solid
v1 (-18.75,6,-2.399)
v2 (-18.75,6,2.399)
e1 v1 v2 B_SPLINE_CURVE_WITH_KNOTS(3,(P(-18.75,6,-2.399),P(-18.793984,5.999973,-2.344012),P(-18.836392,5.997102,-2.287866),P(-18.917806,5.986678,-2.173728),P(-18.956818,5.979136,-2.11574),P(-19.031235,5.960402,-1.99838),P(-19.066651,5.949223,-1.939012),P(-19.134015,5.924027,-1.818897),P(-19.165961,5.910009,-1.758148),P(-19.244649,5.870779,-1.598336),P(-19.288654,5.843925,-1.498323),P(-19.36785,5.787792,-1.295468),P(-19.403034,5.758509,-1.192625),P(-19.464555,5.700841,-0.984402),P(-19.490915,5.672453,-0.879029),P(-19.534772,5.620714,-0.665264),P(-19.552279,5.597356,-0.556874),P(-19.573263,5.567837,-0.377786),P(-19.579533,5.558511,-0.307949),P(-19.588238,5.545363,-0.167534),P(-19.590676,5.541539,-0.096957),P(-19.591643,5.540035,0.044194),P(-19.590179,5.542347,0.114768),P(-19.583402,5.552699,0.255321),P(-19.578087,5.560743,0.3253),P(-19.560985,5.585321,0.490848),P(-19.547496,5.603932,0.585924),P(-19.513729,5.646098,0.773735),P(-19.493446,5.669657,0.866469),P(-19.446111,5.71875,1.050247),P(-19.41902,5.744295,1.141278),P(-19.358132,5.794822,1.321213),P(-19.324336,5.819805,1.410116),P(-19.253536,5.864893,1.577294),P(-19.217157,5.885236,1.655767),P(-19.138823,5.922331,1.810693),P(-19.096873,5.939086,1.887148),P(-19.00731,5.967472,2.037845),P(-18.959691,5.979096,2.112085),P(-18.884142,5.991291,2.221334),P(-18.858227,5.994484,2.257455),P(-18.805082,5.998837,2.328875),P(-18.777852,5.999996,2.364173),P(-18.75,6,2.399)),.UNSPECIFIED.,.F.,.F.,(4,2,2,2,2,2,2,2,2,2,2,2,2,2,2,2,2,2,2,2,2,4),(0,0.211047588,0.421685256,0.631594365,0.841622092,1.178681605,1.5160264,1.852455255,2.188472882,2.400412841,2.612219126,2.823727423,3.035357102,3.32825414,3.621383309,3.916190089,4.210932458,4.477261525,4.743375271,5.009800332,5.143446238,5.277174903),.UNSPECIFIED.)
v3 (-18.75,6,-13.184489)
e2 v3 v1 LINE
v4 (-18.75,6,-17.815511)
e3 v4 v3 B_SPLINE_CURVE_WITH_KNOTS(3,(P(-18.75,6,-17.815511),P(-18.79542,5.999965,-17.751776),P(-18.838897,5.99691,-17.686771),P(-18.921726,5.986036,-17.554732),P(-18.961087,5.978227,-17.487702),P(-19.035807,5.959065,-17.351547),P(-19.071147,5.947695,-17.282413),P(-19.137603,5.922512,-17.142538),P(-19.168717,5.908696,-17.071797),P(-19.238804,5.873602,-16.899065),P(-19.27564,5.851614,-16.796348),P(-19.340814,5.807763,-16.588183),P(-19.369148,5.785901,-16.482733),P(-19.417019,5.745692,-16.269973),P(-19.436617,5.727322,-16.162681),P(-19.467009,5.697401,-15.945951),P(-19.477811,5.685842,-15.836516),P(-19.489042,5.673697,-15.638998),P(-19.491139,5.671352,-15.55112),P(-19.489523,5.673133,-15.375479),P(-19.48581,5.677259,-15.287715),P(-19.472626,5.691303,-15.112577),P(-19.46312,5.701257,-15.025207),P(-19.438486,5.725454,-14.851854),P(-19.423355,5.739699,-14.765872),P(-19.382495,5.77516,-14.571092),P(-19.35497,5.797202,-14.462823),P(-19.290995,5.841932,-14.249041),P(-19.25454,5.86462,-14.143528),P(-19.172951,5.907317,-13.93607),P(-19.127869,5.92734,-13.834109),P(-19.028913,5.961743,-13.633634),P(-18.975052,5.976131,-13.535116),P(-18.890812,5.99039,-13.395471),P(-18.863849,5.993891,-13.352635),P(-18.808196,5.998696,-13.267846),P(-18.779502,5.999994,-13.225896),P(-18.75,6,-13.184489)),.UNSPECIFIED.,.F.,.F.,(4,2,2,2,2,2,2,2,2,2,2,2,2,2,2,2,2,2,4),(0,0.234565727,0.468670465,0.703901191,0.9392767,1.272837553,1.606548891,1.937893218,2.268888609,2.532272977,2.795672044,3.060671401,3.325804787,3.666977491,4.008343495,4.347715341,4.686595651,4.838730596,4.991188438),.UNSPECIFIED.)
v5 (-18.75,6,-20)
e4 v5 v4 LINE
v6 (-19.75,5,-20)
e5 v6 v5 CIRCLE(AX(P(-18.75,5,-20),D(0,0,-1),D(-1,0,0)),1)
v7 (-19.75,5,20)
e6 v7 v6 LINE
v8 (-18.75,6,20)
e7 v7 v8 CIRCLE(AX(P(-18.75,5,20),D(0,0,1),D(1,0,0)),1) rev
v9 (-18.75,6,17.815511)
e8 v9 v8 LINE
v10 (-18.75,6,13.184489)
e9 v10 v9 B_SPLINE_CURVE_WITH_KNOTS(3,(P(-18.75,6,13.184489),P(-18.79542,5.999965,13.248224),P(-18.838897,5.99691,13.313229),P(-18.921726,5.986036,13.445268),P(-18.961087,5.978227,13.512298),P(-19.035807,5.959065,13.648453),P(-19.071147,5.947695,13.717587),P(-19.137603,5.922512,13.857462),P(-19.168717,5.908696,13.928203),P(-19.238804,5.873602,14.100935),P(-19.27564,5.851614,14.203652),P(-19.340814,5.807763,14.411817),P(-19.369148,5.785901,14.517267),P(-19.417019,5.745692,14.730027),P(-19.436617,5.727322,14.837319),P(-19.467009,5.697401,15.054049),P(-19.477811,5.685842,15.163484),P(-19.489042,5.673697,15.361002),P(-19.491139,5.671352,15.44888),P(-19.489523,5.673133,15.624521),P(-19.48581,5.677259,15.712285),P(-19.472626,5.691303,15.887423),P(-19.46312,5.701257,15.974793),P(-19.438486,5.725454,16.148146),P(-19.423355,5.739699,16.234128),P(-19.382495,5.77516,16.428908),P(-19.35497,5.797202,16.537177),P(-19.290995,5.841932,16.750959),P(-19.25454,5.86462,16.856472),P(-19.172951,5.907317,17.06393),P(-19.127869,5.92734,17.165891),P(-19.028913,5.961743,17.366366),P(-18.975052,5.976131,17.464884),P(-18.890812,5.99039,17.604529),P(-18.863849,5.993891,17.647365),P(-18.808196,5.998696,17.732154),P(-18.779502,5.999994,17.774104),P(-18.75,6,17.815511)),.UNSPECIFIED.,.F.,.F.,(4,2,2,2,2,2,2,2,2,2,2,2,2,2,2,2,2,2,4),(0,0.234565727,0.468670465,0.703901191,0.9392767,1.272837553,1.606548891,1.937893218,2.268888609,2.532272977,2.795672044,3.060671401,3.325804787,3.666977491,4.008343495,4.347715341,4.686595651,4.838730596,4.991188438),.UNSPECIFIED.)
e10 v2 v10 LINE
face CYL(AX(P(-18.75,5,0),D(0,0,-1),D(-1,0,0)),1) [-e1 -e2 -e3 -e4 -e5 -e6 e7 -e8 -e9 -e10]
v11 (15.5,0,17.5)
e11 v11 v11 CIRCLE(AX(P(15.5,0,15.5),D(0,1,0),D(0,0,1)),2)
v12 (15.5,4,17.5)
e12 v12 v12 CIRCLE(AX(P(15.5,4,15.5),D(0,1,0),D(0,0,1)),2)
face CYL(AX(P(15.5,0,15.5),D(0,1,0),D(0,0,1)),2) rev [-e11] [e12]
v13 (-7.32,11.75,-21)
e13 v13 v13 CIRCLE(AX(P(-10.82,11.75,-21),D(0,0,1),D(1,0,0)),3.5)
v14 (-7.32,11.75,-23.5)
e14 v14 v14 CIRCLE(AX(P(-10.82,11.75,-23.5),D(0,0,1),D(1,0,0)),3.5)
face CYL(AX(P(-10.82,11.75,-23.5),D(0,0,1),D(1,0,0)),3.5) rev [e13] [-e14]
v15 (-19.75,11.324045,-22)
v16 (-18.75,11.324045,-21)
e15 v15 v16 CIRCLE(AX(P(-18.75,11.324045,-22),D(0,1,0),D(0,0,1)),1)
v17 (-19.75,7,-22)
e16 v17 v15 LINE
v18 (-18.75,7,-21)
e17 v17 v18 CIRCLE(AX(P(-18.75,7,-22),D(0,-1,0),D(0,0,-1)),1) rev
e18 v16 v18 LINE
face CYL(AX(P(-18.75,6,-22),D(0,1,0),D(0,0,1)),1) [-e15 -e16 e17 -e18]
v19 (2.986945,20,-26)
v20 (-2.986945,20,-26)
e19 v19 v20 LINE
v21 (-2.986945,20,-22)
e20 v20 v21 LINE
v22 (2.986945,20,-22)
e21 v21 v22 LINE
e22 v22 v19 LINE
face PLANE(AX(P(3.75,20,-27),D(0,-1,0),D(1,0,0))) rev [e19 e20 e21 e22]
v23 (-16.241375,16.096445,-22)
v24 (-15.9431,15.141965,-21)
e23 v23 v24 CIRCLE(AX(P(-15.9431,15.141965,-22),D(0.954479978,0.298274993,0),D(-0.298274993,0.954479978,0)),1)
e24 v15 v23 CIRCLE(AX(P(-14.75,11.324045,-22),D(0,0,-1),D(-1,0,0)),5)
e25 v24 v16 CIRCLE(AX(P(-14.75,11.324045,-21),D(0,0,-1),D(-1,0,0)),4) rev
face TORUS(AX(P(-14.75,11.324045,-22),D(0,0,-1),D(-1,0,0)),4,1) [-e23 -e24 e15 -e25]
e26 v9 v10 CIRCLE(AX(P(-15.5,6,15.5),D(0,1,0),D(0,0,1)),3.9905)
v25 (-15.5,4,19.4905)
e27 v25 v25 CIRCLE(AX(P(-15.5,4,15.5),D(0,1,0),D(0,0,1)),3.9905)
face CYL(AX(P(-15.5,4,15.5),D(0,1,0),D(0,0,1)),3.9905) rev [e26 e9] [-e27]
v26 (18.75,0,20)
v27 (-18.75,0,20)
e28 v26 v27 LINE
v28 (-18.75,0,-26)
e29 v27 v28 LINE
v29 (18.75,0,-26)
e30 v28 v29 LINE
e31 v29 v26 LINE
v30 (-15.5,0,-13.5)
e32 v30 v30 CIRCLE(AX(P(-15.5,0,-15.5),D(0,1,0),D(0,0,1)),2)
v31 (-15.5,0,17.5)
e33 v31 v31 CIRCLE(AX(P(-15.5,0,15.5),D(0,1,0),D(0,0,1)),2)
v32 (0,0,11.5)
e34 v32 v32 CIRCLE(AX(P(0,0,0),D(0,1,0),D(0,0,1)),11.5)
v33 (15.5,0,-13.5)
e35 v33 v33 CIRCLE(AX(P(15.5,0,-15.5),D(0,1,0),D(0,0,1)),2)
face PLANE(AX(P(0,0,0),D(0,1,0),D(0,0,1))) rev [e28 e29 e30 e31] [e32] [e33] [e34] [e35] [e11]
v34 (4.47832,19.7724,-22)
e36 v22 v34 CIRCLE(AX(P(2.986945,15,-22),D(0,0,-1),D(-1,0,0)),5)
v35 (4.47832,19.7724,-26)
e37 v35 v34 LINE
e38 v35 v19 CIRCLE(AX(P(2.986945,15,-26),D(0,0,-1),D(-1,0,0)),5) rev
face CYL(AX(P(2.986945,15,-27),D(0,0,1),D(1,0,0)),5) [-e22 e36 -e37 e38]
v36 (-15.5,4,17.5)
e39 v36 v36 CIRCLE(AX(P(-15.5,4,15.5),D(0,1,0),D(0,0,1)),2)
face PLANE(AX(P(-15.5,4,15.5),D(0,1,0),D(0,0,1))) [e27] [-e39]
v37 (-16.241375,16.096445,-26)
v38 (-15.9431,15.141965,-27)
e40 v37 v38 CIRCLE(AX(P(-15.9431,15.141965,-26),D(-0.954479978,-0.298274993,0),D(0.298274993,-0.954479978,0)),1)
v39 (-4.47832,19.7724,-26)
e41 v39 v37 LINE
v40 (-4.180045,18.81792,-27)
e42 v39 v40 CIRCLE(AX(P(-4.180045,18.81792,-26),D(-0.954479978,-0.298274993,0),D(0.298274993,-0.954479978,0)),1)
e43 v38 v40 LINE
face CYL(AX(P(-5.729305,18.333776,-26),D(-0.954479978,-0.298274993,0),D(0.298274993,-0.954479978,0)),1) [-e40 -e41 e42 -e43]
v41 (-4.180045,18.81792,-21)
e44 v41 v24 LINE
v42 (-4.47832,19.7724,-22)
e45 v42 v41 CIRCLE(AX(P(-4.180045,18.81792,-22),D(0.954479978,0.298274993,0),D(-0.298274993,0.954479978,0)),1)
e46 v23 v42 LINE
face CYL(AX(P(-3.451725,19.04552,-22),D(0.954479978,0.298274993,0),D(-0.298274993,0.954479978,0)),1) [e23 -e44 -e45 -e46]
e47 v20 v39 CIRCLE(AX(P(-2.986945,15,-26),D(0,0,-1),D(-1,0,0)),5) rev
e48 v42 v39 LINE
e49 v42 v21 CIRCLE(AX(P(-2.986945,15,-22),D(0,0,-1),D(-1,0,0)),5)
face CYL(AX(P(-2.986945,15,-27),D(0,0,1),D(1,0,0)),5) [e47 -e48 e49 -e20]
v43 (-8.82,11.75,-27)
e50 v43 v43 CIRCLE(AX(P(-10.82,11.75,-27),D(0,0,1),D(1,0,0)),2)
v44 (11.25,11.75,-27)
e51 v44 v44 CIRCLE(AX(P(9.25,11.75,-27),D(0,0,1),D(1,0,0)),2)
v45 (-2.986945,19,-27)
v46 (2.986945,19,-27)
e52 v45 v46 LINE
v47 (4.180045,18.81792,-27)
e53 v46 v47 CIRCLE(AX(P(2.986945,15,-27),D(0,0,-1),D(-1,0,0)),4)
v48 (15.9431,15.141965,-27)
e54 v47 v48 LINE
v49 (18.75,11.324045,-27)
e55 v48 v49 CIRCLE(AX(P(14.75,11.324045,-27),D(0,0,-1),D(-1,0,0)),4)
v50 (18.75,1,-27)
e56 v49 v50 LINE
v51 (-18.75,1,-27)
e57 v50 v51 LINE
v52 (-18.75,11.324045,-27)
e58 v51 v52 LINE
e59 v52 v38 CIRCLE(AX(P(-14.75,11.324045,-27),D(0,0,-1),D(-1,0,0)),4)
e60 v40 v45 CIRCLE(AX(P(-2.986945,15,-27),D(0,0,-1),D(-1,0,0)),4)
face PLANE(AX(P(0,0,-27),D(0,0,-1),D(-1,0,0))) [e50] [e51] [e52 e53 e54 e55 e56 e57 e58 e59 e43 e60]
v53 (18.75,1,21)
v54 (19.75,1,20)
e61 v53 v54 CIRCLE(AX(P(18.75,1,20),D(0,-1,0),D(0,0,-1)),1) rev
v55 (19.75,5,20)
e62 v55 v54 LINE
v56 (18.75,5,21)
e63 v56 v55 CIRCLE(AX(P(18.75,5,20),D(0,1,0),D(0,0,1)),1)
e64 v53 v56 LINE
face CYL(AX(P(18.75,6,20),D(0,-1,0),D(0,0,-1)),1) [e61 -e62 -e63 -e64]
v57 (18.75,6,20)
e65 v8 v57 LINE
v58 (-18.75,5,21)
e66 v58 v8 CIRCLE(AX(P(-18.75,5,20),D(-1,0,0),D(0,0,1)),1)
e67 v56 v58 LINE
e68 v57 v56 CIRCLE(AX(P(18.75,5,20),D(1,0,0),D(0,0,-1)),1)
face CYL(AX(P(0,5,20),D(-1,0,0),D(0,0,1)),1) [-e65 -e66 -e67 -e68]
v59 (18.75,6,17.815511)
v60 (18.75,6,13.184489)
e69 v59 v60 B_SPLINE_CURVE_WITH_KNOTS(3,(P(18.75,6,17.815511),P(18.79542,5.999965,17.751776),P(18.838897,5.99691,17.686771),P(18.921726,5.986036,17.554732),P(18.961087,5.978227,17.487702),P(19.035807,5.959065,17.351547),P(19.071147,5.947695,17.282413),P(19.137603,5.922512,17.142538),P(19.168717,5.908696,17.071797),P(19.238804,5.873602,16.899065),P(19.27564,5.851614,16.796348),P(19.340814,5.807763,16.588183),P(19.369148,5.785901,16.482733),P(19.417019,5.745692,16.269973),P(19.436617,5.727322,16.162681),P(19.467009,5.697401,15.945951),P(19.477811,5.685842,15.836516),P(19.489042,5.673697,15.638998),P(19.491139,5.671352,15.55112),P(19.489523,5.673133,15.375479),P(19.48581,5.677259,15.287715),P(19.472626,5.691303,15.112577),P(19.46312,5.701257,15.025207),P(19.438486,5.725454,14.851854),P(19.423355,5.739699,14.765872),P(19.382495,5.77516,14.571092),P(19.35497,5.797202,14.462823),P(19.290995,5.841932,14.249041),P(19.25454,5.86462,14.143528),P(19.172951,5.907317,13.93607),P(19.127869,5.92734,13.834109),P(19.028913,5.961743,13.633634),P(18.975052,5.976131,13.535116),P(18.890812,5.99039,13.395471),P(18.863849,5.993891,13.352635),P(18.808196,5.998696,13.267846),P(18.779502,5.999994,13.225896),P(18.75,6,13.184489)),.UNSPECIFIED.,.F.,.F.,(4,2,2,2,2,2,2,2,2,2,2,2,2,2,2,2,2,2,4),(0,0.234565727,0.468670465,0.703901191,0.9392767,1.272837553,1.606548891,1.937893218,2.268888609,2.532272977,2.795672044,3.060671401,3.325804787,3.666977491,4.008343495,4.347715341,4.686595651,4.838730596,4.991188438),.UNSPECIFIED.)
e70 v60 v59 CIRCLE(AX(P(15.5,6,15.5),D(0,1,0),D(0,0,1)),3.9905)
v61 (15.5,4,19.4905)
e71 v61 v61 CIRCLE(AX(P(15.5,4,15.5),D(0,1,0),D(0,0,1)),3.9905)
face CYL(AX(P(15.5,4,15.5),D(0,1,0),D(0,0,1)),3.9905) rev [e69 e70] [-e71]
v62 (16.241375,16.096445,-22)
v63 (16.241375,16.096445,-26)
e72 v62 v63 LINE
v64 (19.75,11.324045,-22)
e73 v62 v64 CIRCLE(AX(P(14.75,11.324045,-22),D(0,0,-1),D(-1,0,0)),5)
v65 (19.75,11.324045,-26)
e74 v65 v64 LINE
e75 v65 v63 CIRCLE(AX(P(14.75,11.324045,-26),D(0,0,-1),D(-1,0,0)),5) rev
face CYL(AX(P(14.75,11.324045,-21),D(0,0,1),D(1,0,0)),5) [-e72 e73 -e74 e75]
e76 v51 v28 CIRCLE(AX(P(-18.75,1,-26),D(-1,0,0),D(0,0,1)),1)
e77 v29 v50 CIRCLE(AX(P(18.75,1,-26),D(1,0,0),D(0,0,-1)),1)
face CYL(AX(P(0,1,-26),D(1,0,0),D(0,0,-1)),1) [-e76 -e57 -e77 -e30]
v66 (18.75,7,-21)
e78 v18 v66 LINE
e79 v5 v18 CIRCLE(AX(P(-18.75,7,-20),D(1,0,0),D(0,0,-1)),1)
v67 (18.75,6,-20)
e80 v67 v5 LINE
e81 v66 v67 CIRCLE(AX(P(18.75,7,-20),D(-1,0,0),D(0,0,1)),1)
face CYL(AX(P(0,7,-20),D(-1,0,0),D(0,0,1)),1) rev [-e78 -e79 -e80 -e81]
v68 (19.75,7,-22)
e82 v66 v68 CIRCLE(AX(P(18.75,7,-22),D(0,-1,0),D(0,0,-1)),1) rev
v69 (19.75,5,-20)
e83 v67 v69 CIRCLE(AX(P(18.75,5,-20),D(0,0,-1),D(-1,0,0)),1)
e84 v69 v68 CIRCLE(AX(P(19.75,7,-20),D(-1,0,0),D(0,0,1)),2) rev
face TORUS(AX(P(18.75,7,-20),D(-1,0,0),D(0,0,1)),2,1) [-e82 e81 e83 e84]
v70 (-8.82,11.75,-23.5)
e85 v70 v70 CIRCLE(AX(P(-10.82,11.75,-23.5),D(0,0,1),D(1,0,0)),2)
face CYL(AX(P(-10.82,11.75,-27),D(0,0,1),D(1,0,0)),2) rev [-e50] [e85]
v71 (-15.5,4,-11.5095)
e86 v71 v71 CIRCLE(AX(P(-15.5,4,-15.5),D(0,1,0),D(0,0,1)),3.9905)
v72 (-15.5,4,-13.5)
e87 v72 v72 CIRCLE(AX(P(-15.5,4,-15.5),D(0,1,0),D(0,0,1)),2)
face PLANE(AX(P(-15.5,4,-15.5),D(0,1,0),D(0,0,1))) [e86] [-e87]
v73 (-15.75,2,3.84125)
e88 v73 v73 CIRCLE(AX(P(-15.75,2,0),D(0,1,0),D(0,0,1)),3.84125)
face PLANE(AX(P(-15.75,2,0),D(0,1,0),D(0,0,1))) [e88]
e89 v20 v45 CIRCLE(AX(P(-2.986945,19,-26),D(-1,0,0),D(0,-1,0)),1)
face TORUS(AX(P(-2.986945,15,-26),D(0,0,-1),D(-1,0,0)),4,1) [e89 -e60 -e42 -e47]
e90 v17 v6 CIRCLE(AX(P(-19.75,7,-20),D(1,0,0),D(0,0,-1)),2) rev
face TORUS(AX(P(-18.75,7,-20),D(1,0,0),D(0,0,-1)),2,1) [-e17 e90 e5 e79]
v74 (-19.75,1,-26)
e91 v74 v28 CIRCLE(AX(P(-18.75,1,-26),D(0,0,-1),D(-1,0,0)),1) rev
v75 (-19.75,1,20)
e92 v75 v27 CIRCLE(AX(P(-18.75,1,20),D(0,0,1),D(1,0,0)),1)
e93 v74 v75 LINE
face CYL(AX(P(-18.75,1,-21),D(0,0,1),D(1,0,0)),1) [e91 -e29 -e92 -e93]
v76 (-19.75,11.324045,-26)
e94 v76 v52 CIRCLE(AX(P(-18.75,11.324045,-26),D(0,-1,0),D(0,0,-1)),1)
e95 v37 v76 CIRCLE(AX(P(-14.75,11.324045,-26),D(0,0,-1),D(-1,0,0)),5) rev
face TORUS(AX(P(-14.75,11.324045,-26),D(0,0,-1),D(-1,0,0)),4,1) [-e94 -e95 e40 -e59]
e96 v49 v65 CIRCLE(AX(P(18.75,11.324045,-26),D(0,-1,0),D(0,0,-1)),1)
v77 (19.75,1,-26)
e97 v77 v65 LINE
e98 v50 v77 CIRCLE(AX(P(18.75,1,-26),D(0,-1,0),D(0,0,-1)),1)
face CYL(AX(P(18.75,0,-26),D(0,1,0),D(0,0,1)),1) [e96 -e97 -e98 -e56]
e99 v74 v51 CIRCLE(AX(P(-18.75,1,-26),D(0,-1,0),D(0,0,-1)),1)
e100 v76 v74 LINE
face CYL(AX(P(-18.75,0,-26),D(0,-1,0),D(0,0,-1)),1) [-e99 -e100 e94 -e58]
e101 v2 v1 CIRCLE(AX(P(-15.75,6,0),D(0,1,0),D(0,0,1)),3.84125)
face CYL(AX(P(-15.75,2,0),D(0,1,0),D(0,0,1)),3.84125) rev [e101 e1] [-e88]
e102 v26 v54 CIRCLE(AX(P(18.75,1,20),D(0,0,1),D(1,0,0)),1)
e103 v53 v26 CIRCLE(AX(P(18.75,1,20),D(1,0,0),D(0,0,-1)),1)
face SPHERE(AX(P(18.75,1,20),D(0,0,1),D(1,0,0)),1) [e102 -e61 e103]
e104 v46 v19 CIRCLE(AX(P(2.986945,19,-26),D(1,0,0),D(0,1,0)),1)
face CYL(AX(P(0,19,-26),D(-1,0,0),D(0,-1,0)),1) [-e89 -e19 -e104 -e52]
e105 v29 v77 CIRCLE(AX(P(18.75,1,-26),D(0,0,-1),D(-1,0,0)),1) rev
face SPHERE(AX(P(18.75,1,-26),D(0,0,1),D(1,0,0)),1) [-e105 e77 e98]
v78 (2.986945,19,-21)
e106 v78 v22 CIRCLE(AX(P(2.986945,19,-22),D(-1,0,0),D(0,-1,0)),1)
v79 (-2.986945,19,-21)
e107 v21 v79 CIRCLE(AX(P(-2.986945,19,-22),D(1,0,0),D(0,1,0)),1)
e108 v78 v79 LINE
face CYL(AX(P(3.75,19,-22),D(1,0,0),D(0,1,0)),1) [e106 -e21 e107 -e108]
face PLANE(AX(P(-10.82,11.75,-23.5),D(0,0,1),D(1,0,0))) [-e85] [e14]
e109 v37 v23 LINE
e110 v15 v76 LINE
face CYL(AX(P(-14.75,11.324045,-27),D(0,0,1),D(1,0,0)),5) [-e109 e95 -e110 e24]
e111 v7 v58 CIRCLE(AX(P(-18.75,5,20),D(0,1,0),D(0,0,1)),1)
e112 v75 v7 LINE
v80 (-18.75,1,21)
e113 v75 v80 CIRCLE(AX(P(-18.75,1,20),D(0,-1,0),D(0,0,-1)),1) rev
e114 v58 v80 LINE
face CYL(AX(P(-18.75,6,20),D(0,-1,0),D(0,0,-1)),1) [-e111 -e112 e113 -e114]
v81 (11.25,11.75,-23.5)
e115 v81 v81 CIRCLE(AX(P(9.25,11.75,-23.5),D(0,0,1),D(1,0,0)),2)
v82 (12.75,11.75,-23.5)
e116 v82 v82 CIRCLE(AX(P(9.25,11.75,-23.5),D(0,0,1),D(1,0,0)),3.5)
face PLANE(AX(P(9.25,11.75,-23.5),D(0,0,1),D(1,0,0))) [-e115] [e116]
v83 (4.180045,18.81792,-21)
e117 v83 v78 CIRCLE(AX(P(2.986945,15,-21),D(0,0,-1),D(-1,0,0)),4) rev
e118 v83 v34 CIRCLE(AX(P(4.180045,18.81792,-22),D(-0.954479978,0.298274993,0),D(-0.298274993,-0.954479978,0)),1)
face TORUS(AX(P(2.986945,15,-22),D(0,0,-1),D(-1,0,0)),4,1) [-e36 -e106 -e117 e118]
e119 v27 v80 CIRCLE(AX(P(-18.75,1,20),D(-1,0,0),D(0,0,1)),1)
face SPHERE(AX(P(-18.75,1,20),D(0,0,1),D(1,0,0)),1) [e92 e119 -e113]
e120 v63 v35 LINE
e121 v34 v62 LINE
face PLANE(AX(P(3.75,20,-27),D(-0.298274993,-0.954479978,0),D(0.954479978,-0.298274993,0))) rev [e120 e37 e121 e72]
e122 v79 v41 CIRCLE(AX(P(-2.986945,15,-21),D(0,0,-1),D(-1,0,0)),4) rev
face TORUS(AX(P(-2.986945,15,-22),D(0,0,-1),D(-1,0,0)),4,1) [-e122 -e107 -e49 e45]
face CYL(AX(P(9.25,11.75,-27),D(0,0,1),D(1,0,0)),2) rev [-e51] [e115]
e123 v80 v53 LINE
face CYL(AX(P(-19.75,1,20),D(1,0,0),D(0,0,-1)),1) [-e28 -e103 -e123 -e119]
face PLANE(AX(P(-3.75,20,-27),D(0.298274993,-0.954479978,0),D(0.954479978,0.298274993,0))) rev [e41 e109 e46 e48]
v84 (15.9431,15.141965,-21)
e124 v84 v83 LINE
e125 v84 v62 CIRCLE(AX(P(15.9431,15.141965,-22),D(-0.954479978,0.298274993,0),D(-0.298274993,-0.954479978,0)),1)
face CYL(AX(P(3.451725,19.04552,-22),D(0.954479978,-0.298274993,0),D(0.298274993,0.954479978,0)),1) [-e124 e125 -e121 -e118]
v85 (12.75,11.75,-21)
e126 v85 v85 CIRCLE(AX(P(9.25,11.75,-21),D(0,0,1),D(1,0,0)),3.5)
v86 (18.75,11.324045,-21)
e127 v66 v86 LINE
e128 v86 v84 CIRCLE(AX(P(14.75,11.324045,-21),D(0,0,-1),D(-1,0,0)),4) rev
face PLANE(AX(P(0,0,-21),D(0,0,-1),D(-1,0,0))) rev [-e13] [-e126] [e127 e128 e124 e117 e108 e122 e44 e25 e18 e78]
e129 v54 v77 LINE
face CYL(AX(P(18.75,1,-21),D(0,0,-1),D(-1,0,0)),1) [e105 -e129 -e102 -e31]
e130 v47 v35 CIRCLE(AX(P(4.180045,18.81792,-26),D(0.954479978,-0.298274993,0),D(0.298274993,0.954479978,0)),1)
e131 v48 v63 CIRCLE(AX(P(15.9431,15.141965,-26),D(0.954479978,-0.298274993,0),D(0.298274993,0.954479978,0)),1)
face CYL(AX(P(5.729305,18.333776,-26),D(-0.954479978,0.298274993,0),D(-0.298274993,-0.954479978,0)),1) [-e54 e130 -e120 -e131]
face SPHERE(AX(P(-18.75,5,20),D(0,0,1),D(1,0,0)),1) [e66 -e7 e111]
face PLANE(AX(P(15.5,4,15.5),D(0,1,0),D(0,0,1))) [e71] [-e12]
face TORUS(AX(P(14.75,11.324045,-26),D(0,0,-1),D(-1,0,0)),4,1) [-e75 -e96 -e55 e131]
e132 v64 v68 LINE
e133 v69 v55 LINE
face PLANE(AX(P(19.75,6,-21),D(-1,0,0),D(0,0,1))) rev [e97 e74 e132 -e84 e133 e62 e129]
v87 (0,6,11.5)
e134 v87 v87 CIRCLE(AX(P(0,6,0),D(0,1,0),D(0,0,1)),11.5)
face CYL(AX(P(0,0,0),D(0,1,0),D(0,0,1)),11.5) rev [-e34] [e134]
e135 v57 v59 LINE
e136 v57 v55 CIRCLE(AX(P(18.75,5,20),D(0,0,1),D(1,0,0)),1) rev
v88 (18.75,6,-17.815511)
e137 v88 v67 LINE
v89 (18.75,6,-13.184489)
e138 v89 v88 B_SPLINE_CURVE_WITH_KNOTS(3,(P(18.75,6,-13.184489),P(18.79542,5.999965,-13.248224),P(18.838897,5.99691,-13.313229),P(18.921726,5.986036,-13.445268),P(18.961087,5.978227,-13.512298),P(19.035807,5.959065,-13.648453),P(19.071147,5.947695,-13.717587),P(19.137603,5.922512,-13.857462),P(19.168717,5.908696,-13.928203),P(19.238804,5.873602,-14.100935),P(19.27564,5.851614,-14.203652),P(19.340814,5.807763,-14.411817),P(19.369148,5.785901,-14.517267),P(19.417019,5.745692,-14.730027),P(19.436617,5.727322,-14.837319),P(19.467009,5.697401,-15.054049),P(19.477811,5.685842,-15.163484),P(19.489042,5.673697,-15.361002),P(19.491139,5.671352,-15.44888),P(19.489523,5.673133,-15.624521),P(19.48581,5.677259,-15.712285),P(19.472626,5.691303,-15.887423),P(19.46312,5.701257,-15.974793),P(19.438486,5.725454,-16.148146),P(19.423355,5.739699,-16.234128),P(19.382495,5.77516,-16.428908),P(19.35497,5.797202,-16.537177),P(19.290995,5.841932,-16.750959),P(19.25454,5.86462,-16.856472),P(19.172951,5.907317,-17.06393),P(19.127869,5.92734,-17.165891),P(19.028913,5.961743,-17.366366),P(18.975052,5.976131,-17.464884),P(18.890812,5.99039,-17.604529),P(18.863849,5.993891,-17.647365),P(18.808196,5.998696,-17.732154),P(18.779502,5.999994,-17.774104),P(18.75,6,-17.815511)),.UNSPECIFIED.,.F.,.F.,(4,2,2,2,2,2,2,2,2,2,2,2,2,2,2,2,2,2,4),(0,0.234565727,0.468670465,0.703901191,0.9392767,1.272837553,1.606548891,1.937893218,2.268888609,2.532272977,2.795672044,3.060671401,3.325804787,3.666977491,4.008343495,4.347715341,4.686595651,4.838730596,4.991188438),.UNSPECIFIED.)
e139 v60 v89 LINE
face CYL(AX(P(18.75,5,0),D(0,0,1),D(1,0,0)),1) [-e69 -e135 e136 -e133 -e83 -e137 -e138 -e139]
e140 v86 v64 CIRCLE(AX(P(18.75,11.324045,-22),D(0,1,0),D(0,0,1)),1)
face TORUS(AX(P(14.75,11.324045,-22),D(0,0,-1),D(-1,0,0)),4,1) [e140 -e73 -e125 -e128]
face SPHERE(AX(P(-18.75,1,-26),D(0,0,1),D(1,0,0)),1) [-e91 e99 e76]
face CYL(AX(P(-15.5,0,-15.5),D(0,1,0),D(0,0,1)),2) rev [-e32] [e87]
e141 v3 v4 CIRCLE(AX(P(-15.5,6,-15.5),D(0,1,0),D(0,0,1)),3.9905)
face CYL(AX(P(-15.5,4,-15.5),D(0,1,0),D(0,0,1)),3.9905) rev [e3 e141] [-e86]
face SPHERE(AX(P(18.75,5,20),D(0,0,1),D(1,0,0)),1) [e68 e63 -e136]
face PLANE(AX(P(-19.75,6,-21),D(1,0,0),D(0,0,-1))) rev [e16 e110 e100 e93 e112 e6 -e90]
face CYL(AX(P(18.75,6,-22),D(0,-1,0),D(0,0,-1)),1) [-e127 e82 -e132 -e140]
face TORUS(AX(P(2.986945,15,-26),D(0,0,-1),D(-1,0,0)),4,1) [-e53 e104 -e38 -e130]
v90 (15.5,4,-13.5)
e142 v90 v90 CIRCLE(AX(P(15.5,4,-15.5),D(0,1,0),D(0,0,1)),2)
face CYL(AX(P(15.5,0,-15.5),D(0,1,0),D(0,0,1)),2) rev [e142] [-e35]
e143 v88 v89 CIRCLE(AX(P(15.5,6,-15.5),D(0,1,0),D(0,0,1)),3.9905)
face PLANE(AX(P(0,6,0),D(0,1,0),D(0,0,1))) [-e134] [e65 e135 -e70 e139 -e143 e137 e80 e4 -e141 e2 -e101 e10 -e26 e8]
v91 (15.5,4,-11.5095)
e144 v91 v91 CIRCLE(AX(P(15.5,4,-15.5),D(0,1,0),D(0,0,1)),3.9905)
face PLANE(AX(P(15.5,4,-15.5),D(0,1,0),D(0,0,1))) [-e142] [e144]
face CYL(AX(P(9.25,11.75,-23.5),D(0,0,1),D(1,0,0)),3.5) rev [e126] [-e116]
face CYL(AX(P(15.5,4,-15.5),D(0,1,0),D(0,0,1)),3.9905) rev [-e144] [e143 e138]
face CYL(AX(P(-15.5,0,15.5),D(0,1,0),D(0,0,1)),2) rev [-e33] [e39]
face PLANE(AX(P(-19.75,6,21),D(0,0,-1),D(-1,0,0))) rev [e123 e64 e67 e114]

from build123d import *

# Parameters (mm, degrees)
SKETCH1_W           = 39.5
SKETCH1_H           = 42
BOSS_EXTRUDE1_DEPTH = 6
SKETCH3_R           = 3.9905
CUT_EXTRUDE1_DEPTH  = 2
SKETCH4_R           = 11.5
SKETCH4_R_2         = 2
CUT_EXTRUDE2_DEPTH  = 30.445925015
BOSS_EXTRUDE2_DEPTH = 6
SKETCH6_R           = 3.5
CUT_EXTRUDE3_DEPTH  = 2.5
SKETCH7_R           = 2
CUT_EXTRUDE4_DEPTH  = 51.537733428
FILLET1_R           = 5
SKETCH8_R           = 3.84125
CUT_EXTRUDE5_DEPTH  = 4
FILLET2_R           = 1


with BuildPart() as part:
    # Sketch1 → Boss-Extrude1 (new body)
    with BuildSketch(Plane(origin=(0, 0, 0), x_dir=(1, 0, 0), z_dir=(0, 1, 0))):
        Rectangle(SKETCH1_W, SKETCH1_H)
    extrude(amount=BOSS_EXTRUDE1_DEPTH)

    # Sketch3 → Cut-Extrude1 (cut)
    with BuildSketch(Plane(origin=(0, 6, 0), x_dir=(1, 0, 0), z_dir=(0, 1, 0))):
        with Locations(Location((-15.5, 15.5, 0), (0, 0, 270))):
            Circle(SKETCH3_R)
        with Locations(Location((15.5, 15.5, 0), (0, 0, 270))):
            Circle(SKETCH3_R)
        with Locations(Location((-15.5, -15.5, 0), (0, 0, 270))):
            Circle(SKETCH3_R)
        with Locations(Location((15.5, -15.5, 0), (0, 0, 270))):
            Circle(SKETCH3_R)
    extrude(amount=-CUT_EXTRUDE1_DEPTH, mode=Mode.SUBTRACT)

    # Sketch4 → Cut-Extrude2 (cut, through all)
    with BuildSketch(Plane(origin=(0, 6, 0), x_dir=(1, 0, 0), z_dir=(0, 1, 0))):
        with Locations(Location((0, 0, 0), (0, 0, 270))):
            Circle(SKETCH4_R)
        with Locations(Location((15.5, 15.5, 0), (0, 0, 270))):
            Circle(SKETCH4_R_2)
        with Locations(Location((-15.5, 15.5, 0), (0, 0, 270))):
            Circle(SKETCH4_R_2)
        with Locations(Location((-15.5, -15.5, 0), (0, 0, 270))):
            Circle(SKETCH4_R_2)
        with Locations(Location((15.5, -15.5, 0), (0, 0, 270))):
            Circle(SKETCH4_R_2)
    extrude(amount=-CUT_EXTRUDE2_DEPTH, mode=Mode.SUBTRACT)

    # Sketch5 → Boss-Extrude2 (add)
    with BuildSketch(Plane(origin=(0, 0, -21), x_dir=(-1, 0, 0), z_dir=(0, 0, -1))):
        Polygon((-19.75, 15), (-19.75, 0), (19.75, 0), (19.75, 15), (3.75, 20), (-3.75, 20), align=None)
    extrude(amount=BOSS_EXTRUDE2_DEPTH)

    # Sketch6 → Cut-Extrude3 (cut)
    with BuildSketch(Plane.XY.offset(-21)):
        with Locations((-10.82, 11.75)):
            Circle(SKETCH6_R)
        with Locations((9.25, 11.75)):
            Circle(SKETCH6_R)
    extrude(amount=-CUT_EXTRUDE3_DEPTH, mode=Mode.SUBTRACT)

    # Sketch7 → Cut-Extrude4 (cut, through all)
    with BuildSketch(Plane.XY.offset(-21)):
        with Locations((-10.82, 11.75)):
            Circle(SKETCH7_R)
        with Locations((9.25, 11.75)):
            Circle(SKETCH7_R)
    extrude(amount=-CUT_EXTRUDE4_DEPTH, mode=Mode.SUBTRACT)

    # Fillet1
    fillet1_edges = [part.edges().sort_by_distance(p)[0] for p in [
        (-19.75, 15, -24),
        (-3.75, 20, -24),
        (3.75, 20, -24),
        (19.75, 15, -24),
    ]]
    fillet(fillet1_edges, radius=FILLET1_R)

    # Sketch8 → Cut-Extrude5 (cut)
    with BuildSketch(Plane(origin=(0, 6, 0), x_dir=(1, 0, 0), z_dir=(0, 1, 0))):
        with Locations(Location((-15.75, 0, 0), (0, 0, 270))):
            Circle(SKETCH8_R)
    extrude(amount=-CUT_EXTRUDE5_DEPTH, mode=Mode.SUBTRACT)

    # Fillet2
    # the kernel refuses this fillet: 1 mm, written as the material it adds along each edge
    with BuildSketch(Plane(origin=(-19.75, 6, -21), x_dir=(0, 1, 0), z_dir=(1, 0, 0))) as fillet2_piece_1:
        with BuildLine():
            CenterArc((FILLET2_R, FILLET2_R), FILLET2_R, 180, 90)
            Line((0, FILLET2_R), (0, 0))
            Line((0, 0), (FILLET2_R, 0))
        make_face()
    extrude(amount=39.5)
    # the kernel refuses this fillet: 1 mm, written as the material it takes off along each edge
    with BuildSketch(Plane(origin=(18.75, 1, 20), x_dir=(0, 0, 1), z_dir=(1, 0, 0))) as fillet2_2_piece_1_section:
        Polygon((0, 0), (FILLET2_R, 0), (FILLET2_R, FILLET2_R), (0, FILLET2_R), align=None)
    fillet2_2_piece_1 = extrude(amount=FILLET2_R, mode=Mode.PRIVATE)
    fillet2_2_piece_1 = fillet2_2_piece_1 - Plane(origin=(18.75, 1, 20), x_dir=(0, 0.7071067811865475, -0.7071067811865475), z_dir=(1, 0, 0)) * Sphere(FILLET2_R, mode=Mode.PRIVATE)
    add(fillet2_2_piece_1, mode=Mode.SUBTRACT)
    with BuildSketch(Plane(origin=(-18.75, 1, 20), x_dir=(0, 0, 1), z_dir=(-1, 0, 0))) as fillet2_2_piece_2_section:
        Polygon((0, 0), (FILLET2_R, 0), (FILLET2_R, -FILLET2_R), (0, -FILLET2_R), align=None)
    fillet2_2_piece_2 = extrude(amount=FILLET2_R, mode=Mode.PRIVATE)
    fillet2_2_piece_2 = fillet2_2_piece_2 - Plane(origin=(-18.75, 1, 20), x_dir=(0, 0.7071067811865475, -0.7071067811865475), z_dir=(-1, 0, 0)) * Sphere(FILLET2_R, mode=Mode.PRIVATE)
    add(fillet2_2_piece_2, mode=Mode.SUBTRACT)
    with BuildSketch(Plane(origin=(-18.75, 1, -26), x_dir=(0, 0, -1), z_dir=(-1, 0, 0))) as fillet2_2_piece_3_section:
        Polygon((0, 0), (FILLET2_R, 0), (FILLET2_R, FILLET2_R), (0, FILLET2_R), align=None)
    fillet2_2_piece_3 = extrude(amount=FILLET2_R, mode=Mode.PRIVATE)
    fillet2_2_piece_3 = fillet2_2_piece_3 - Plane(origin=(-18.75, 1, -26), x_dir=(0, 0.7071067811865475, 0.7071067811865475), z_dir=(-1, 0, 0)) * Sphere(FILLET2_R, mode=Mode.PRIVATE)
    add(fillet2_2_piece_3, mode=Mode.SUBTRACT)
    with BuildSketch(Plane(origin=(18.75, 1, -26), x_dir=(0, 0, -1), z_dir=(1, 0, 0))) as fillet2_2_piece_4_section:
        Polygon((0, 0), (FILLET2_R, 0), (FILLET2_R, -FILLET2_R), (0, -FILLET2_R), align=None)
    fillet2_2_piece_4 = extrude(amount=FILLET2_R, mode=Mode.PRIVATE)
    fillet2_2_piece_4 = fillet2_2_piece_4 - Plane(origin=(18.75, 1, -26), x_dir=(0, 0.7071067811865475, 0.7071067811865475), z_dir=(1, 0, 0)) * Sphere(FILLET2_R, mode=Mode.PRIVATE)
    add(fillet2_2_piece_4, mode=Mode.SUBTRACT)
    with BuildSketch(Plane(origin=(-2.986945386, 15, -27), x_dir=(-0.2982749931359473, 0.9544799780350296, 0), z_dir=(-0.9544799780350296, -0.2982749931359473, 0))) as fillet2_2_piece_5:
        with BuildLine():
            CenterArc((5 - FILLET2_R, -FILLET2_R), FILLET2_R, 0, 90)
            Line((5, -FILLET2_R), (5, 0))
            Line((5, 0), (5 - FILLET2_R, 0))
        make_face()
    revolve(axis=Axis((-2.986945386, 15, -27), (0, 0, -1)), revolution_arc=17.354024636, mode=Mode.SUBTRACT)
    with BuildSketch(Plane(origin=(2.986945386, 15, -27), x_dir=(0.2982749931359473, 0.9544799780350296, 0), z_dir=(0.9544799780350296, -0.2982749931359473, 0))) as fillet2_2_piece_6:
        with BuildLine():
            CenterArc((5 - FILLET2_R, FILLET2_R), FILLET2_R, 270, 90)
            Line((5, FILLET2_R), (5, 0))
            Line((5, 0), (5 - FILLET2_R, 0))
        make_face()
    revolve(axis=Axis((2.986945386, 15, -27), (0, 0, 1)), revolution_arc=17.354024636, mode=Mode.SUBTRACT)
    with BuildSketch(Plane(origin=(14.75, 11.324045433, -27), x_dir=(1, 0, 0), z_dir=(0, -1, 0))) as fillet2_2_piece_7:
        with BuildLine():
            CenterArc((5 - FILLET2_R, FILLET2_R), FILLET2_R, 270, 90)
            Line((5, FILLET2_R), (5, 0))
            Line((5, 0), (5 - FILLET2_R, 0))
        make_face()
    revolve(axis=Axis((14.75, 11.324045433, -27), (0, 0, 1)), revolution_arc=72.645975364, mode=Mode.SUBTRACT)
    with BuildSketch(Plane(origin=(22.25, 6, 21), x_dir=(0, 0, -1), z_dir=(-1, 0, 0))) as fillet2_2_piece_8:
        with BuildLine():
            CenterArc((FILLET2_R, FILLET2_R), FILLET2_R, 180, 90)
            Line((0, FILLET2_R), (0, 0))
            Line((0, 0), (FILLET2_R, 0))
        make_face()
    extrude(amount=44.5, mode=Mode.SUBTRACT)
    with BuildSketch(Plane(origin=(18.75, 0, 21), x_dir=(0, 1, 0), z_dir=(-1, 0, 0))) as fillet2_2_piece_9:
        with BuildLine():
            CenterArc((FILLET2_R, FILLET2_R), FILLET2_R, 180, 90)
            Line((0, FILLET2_R), (0, 0))
            Line((0, 0), (FILLET2_R, 0))
        make_face()
    extrude(amount=37.5, mode=Mode.SUBTRACT)
    with BuildSketch(Plane(origin=(-19.75, 0, -26), x_dir=(0, 1, 0), z_dir=(0, 0, 1)), Plane(origin=(19.75, 0, -26), x_dir=(-1, 0, 0), z_dir=(0, 0, 1))) as fillet2_2_piece_10:
        with BuildLine():
            CenterArc((FILLET2_R, -FILLET2_R), FILLET2_R, 90, 90)
            Line((0, -FILLET2_R), (0, 0))
            Line((0, 0), (FILLET2_R, 0))
        make_face()
    extrude(amount=46, mode=Mode.SUBTRACT)
    with BuildSketch(Plane(origin=(-19.75, 1, -27), x_dir=(0, 0, 1), z_dir=(0, 1, 0))) as fillet2_2_piece_11:
        with BuildLine():
            CenterArc((FILLET2_R, FILLET2_R), FILLET2_R, 180, 90)
            Line((0, FILLET2_R), (0, 0))
            Line((0, 0), (FILLET2_R, 0))
        make_face()
    extrude(amount=10.324045433, mode=Mode.SUBTRACT)
    with BuildSketch(Plane(origin=(18.75, 0, -27), x_dir=(0, 1, 0), z_dir=(-1, 0, 0))) as fillet2_2_piece_12:
        with BuildLine():
            CenterArc((FILLET2_R, -FILLET2_R), FILLET2_R, 90, 90)
            Line((0, -FILLET2_R), (0, 0))
            Line((0, 0), (FILLET2_R, 0))
        make_face()
    extrude(amount=37.5, mode=Mode.SUBTRACT)
    with BuildSketch(Plane(origin=(19.75, 1, 21), x_dir=(-1, 0, 0), z_dir=(0, 1, 0)), Plane(origin=(-19.75, 1, 21), x_dir=(0, 0, -1), z_dir=(0, 1, 0))) as fillet2_2_piece_13:
        with BuildLine():
            CenterArc((FILLET2_R, -FILLET2_R), FILLET2_R, 90, 90)
            Line((0, -FILLET2_R), (0, 0))
            Line((0, 0), (FILLET2_R, 0))
        make_face()
    extrude(amount=7.5, mode=Mode.SUBTRACT)
    with BuildSketch(Plane(origin=(19.75, 11.324045433, -27), x_dir=(-1, 0, 0), z_dir=(0, -1, 0))) as fillet2_2_piece_14:
        with BuildLine():
            CenterArc((FILLET2_R, -FILLET2_R), FILLET2_R, 90, 90)
            Line((0, -FILLET2_R), (0, 0))
            Line((0, 0), (FILLET2_R, 0))
        make_face()
    extrude(amount=10.324045433, mode=Mode.SUBTRACT)
    with BuildSketch(Plane(origin=(4.478320351, 19.77239989, -27), x_dir=(-0.2982749931359471, -0.9544799780350297, 0), z_dir=(0.9544799780350297, -0.2982749931359471, 0)), Plane(origin=(-16.241374966, 16.096445323, -27), x_dir=(0.2982749931359466, -0.9544799780350298, 0), z_dir=(0.9544799780350299, 0.29827499313594663, 0))) as fillet2_2_piece_15:
        with BuildLine():
            CenterArc((FILLET2_R, -FILLET2_R), FILLET2_R, 90, 90)
            Line((0, -FILLET2_R), (0, 0))
            Line((0, 0), (FILLET2_R, 0))
        make_face()
    extrude(amount=12.324045433, mode=Mode.SUBTRACT)
    with BuildSketch(Plane(origin=(-2.986945386, 20, -27), x_dir=(0, -1, 0), z_dir=(1, 0, 0))) as fillet2_2_piece_16:
        with BuildLine():
            CenterArc((FILLET2_R, -FILLET2_R), FILLET2_R, 90, 90)
            Line((0, -FILLET2_R), (0, 0))
            Line((0, 0), (FILLET2_R, 0))
        make_face()
    extrude(amount=5.973890772, mode=Mode.SUBTRACT)
    with BuildSketch(Plane(origin=(-14.75, 11.324045433, -27), x_dir=(-1, 0, 0), z_dir=(0, -1, 0))) as fillet2_2_piece_17:
        with BuildLine():
            CenterArc((5 - FILLET2_R, -FILLET2_R), FILLET2_R, 0, 90)
            Line((5 - FILLET2_R, 0), (5, 0))
            Line((5, 0), (5, -FILLET2_R))
        make_face()
    revolve(axis=Axis((-14.75, 11.324045433, -27), (0, 0, -1)), revolution_arc=72.645975364, mode=Mode.SUBTRACT)
    # the kernel refuses this fillet: 1 mm, written as the material it takes off along each edge
    with BuildSketch(Plane(origin=(18.75, 5, 20), x_dir=(1, 0, 0), z_dir=(0, 1, 0))) as fillet2_3_piece_1_section:
        Polygon((0, 0), (FILLET2_R, 0), (FILLET2_R, -FILLET2_R), (0, -FILLET2_R), align=None)
    fillet2_3_piece_1 = extrude(amount=FILLET2_R, mode=Mode.PRIVATE)
    fillet2_3_piece_1 = fillet2_3_piece_1 - Plane(origin=(18.75, 5, 20), x_dir=(-0.7071067811865476, 0, -0.7071067811865475), z_dir=(0, 1, 0)) * Sphere(FILLET2_R, mode=Mode.PRIVATE)
    add(fillet2_3_piece_1, mode=Mode.SUBTRACT)
    with BuildSketch(Plane(origin=(-18.75, 5, 20), x_dir=(0, 1, 0), z_dir=(-1, 0, 0))) as fillet2_3_piece_2_section:
        Polygon((0, 0), (FILLET2_R, 0), (FILLET2_R, -FILLET2_R), (0, -FILLET2_R), align=None)
    fillet2_3_piece_2 = extrude(amount=FILLET2_R, mode=Mode.PRIVATE)
    fillet2_3_piece_2 = fillet2_3_piece_2 - Plane(origin=(-18.75, 5, 20), x_dir=(0, -0.7071067811865475, -0.7071067811865475), z_dir=(-1, 0, 0)) * Sphere(FILLET2_R, mode=Mode.PRIVATE)
    add(fillet2_3_piece_2, mode=Mode.SUBTRACT)
    with BuildSketch(Plane(origin=(-19.75, 6, 20), x_dir=(0, -1, 0), z_dir=(0, 0, -1))) as fillet2_3_piece_3:
        with BuildLine():
            CenterArc((FILLET2_R, -FILLET2_R), FILLET2_R, 90, 90)
            Line((0, -FILLET2_R), (0, 0))
            Line((0, 0), (FILLET2_R, 0))
        make_face()
    extrude(amount=40, mode=Mode.SUBTRACT)
    with BuildSketch(Plane(origin=(19.75, 6, -20), x_dir=(-1, 0, 0), z_dir=(0, 0, 1))) as fillet2_3_piece_4:
        with BuildLine():
            CenterArc((FILLET2_R, FILLET2_R), FILLET2_R, 180, 90)
            Line((0, FILLET2_R), (0, 0))
            Line((0, 0), (FILLET2_R, 0))
        make_face()
    extrude(amount=40, mode=Mode.SUBTRACT)
    with BuildSketch(Plane(origin=(-19.75, 7, -21), x_dir=(0, 0, -1), z_dir=(0, 1, 0))) as fillet2_3_piece_5:
        with BuildLine():
            CenterArc((FILLET2_R, -FILLET2_R), FILLET2_R, 90, 90)
            Line((0, -FILLET2_R), (0, 0))
            Line((0, 0), (FILLET2_R, 0))
        make_face()
    extrude(amount=4.324045433, mode=Mode.SUBTRACT)
    with BuildSketch(Plane(origin=(19.75, 11.324045433, -21), x_dir=(-1, 0, 0), z_dir=(0, -1, 0))) as fillet2_3_piece_6:
        with BuildLine():
            CenterArc((FILLET2_R, FILLET2_R), FILLET2_R, 180, 90)
            Line((0, FILLET2_R), (0, 0))
            Line((0, 0), (FILLET2_R, 0))
        make_face()
    extrude(amount=4.324045433, mode=Mode.SUBTRACT)
    with BuildSketch(Plane(origin=(4.478320351, 19.77239989, -21), x_dir=(-0.2982749931359471, -0.9544799780350297, 0), z_dir=(0.9544799780350297, -0.2982749931359471, 0)), Plane(origin=(-16.241374966, 16.096445323, -21), x_dir=(0.2982749931359466, -0.9544799780350298, 0), z_dir=(0.9544799780350299, 0.29827499313594663, 0))) as fillet2_3_piece_7:
        with BuildLine():
            CenterArc((FILLET2_R, FILLET2_R), FILLET2_R, 180, 90)
            Line((0, FILLET2_R), (0, 0))
            Line((0, 0), (FILLET2_R, 0))
        make_face()
    extrude(amount=12.324045433, mode=Mode.SUBTRACT)
    with BuildSketch(Plane(origin=(-2.986945386, 20, -21), x_dir=(0, -1, 0), z_dir=(1, 0, 0))) as fillet2_3_piece_8:
        with BuildLine():
            CenterArc((FILLET2_R, FILLET2_R), FILLET2_R, 180, 90)
            Line((0, FILLET2_R), (0, 0))
            Line((0, 0), (FILLET2_R, 0))
        make_face()
    extrude(amount=5.973890772, mode=Mode.SUBTRACT)
    with BuildSketch(Plane(origin=(-14.75, 11.324045433, -21), x_dir=(-1, 0, 0), z_dir=(0, -1, 0))) as fillet2_3_piece_9:
        with BuildLine():
            CenterArc((5 - FILLET2_R, FILLET2_R), FILLET2_R, 270, 90)
            Line((5 - FILLET2_R, 0), (5, 0))
            Line((5, 0), (5, FILLET2_R))
        make_face()
    revolve(axis=Axis((-14.75, 11.324045433, -21), (0, 0, -1)), revolution_arc=72.645975364, mode=Mode.SUBTRACT)
    with BuildSketch(Plane(origin=(-2.986945386, 15, -21), x_dir=(-0.2982749931359473, 0.9544799780350296, 0), z_dir=(-0.9544799780350296, -0.2982749931359473, 0))) as fillet2_3_piece_10:
        with BuildLine():
            CenterArc((5 - FILLET2_R, FILLET2_R), FILLET2_R, 270, 90)
            Line((5, FILLET2_R), (5, 0))
            Line((5, 0), (5 - FILLET2_R, 0))
        make_face()
    revolve(axis=Axis((-2.986945386, 15, -21), (0, 0, -1)), revolution_arc=17.354024636, mode=Mode.SUBTRACT)
    with BuildSketch(Plane(origin=(2.986945386, 15, -21), x_dir=(0.2982749931359473, 0.9544799780350296, 0), z_dir=(0.9544799780350296, -0.2982749931359473, 0))) as fillet2_3_piece_11:
        with BuildLine():
            CenterArc((5 - FILLET2_R, -FILLET2_R), FILLET2_R, 0, 90)
            Line((5, -FILLET2_R), (5, 0))
            Line((5, 0), (5 - FILLET2_R, 0))
        make_face()
    revolve(axis=Axis((2.986945386, 15, -21), (0, 0, 1)), revolution_arc=17.354024636, mode=Mode.SUBTRACT)
    with BuildSketch(Plane(origin=(14.75, 11.324045433, -21), x_dir=(1, 0, 0), z_dir=(0, -1, 0))) as fillet2_3_piece_12:
        with BuildLine():
            CenterArc((5 - FILLET2_R, -FILLET2_R), FILLET2_R, 0, 90)
            Line((5, -FILLET2_R), (5, 0))
            Line((5, 0), (5 - FILLET2_R, 0))
        make_face()
    revolve(axis=Axis((14.75, 11.324045433, -21), (0, 0, 1)), revolution_arc=72.645975364, mode=Mode.SUBTRACT)
    with BuildSketch(Plane(origin=(19.75, 7, -20), x_dir=(0, 0, -1), z_dir=(0, 1, 0))) as fillet2_3_piece_13:
        with BuildLine():
            CenterArc((1 + FILLET2_R, FILLET2_R), FILLET2_R, 180, 90)
            Line((1 + FILLET2_R, 0), (1, 0))
            Line((1, 0), (1, FILLET2_R))
        make_face()
    revolve(axis=Axis((19.75, 7, -20), (-1, 0, 0)), revolution_arc=90, mode=Mode.SUBTRACT)
    with BuildSketch(Plane(origin=(-19.75, 7, -20), x_dir=(0, 0, -1), z_dir=(0, 1, 0))) as fillet2_3_piece_14:
        with BuildLine():
            CenterArc((1 + FILLET2_R, -FILLET2_R), FILLET2_R, 90, 90)
            Line((1, -FILLET2_R), (1, 0))
            Line((1, 0), (1 + FILLET2_R, 0))
        make_face()
    revolve(axis=Axis((-19.75, 7, -20), (-1, 0, 0)), revolution_arc=90, mode=Mode.SUBTRACT)


solid = part.part
